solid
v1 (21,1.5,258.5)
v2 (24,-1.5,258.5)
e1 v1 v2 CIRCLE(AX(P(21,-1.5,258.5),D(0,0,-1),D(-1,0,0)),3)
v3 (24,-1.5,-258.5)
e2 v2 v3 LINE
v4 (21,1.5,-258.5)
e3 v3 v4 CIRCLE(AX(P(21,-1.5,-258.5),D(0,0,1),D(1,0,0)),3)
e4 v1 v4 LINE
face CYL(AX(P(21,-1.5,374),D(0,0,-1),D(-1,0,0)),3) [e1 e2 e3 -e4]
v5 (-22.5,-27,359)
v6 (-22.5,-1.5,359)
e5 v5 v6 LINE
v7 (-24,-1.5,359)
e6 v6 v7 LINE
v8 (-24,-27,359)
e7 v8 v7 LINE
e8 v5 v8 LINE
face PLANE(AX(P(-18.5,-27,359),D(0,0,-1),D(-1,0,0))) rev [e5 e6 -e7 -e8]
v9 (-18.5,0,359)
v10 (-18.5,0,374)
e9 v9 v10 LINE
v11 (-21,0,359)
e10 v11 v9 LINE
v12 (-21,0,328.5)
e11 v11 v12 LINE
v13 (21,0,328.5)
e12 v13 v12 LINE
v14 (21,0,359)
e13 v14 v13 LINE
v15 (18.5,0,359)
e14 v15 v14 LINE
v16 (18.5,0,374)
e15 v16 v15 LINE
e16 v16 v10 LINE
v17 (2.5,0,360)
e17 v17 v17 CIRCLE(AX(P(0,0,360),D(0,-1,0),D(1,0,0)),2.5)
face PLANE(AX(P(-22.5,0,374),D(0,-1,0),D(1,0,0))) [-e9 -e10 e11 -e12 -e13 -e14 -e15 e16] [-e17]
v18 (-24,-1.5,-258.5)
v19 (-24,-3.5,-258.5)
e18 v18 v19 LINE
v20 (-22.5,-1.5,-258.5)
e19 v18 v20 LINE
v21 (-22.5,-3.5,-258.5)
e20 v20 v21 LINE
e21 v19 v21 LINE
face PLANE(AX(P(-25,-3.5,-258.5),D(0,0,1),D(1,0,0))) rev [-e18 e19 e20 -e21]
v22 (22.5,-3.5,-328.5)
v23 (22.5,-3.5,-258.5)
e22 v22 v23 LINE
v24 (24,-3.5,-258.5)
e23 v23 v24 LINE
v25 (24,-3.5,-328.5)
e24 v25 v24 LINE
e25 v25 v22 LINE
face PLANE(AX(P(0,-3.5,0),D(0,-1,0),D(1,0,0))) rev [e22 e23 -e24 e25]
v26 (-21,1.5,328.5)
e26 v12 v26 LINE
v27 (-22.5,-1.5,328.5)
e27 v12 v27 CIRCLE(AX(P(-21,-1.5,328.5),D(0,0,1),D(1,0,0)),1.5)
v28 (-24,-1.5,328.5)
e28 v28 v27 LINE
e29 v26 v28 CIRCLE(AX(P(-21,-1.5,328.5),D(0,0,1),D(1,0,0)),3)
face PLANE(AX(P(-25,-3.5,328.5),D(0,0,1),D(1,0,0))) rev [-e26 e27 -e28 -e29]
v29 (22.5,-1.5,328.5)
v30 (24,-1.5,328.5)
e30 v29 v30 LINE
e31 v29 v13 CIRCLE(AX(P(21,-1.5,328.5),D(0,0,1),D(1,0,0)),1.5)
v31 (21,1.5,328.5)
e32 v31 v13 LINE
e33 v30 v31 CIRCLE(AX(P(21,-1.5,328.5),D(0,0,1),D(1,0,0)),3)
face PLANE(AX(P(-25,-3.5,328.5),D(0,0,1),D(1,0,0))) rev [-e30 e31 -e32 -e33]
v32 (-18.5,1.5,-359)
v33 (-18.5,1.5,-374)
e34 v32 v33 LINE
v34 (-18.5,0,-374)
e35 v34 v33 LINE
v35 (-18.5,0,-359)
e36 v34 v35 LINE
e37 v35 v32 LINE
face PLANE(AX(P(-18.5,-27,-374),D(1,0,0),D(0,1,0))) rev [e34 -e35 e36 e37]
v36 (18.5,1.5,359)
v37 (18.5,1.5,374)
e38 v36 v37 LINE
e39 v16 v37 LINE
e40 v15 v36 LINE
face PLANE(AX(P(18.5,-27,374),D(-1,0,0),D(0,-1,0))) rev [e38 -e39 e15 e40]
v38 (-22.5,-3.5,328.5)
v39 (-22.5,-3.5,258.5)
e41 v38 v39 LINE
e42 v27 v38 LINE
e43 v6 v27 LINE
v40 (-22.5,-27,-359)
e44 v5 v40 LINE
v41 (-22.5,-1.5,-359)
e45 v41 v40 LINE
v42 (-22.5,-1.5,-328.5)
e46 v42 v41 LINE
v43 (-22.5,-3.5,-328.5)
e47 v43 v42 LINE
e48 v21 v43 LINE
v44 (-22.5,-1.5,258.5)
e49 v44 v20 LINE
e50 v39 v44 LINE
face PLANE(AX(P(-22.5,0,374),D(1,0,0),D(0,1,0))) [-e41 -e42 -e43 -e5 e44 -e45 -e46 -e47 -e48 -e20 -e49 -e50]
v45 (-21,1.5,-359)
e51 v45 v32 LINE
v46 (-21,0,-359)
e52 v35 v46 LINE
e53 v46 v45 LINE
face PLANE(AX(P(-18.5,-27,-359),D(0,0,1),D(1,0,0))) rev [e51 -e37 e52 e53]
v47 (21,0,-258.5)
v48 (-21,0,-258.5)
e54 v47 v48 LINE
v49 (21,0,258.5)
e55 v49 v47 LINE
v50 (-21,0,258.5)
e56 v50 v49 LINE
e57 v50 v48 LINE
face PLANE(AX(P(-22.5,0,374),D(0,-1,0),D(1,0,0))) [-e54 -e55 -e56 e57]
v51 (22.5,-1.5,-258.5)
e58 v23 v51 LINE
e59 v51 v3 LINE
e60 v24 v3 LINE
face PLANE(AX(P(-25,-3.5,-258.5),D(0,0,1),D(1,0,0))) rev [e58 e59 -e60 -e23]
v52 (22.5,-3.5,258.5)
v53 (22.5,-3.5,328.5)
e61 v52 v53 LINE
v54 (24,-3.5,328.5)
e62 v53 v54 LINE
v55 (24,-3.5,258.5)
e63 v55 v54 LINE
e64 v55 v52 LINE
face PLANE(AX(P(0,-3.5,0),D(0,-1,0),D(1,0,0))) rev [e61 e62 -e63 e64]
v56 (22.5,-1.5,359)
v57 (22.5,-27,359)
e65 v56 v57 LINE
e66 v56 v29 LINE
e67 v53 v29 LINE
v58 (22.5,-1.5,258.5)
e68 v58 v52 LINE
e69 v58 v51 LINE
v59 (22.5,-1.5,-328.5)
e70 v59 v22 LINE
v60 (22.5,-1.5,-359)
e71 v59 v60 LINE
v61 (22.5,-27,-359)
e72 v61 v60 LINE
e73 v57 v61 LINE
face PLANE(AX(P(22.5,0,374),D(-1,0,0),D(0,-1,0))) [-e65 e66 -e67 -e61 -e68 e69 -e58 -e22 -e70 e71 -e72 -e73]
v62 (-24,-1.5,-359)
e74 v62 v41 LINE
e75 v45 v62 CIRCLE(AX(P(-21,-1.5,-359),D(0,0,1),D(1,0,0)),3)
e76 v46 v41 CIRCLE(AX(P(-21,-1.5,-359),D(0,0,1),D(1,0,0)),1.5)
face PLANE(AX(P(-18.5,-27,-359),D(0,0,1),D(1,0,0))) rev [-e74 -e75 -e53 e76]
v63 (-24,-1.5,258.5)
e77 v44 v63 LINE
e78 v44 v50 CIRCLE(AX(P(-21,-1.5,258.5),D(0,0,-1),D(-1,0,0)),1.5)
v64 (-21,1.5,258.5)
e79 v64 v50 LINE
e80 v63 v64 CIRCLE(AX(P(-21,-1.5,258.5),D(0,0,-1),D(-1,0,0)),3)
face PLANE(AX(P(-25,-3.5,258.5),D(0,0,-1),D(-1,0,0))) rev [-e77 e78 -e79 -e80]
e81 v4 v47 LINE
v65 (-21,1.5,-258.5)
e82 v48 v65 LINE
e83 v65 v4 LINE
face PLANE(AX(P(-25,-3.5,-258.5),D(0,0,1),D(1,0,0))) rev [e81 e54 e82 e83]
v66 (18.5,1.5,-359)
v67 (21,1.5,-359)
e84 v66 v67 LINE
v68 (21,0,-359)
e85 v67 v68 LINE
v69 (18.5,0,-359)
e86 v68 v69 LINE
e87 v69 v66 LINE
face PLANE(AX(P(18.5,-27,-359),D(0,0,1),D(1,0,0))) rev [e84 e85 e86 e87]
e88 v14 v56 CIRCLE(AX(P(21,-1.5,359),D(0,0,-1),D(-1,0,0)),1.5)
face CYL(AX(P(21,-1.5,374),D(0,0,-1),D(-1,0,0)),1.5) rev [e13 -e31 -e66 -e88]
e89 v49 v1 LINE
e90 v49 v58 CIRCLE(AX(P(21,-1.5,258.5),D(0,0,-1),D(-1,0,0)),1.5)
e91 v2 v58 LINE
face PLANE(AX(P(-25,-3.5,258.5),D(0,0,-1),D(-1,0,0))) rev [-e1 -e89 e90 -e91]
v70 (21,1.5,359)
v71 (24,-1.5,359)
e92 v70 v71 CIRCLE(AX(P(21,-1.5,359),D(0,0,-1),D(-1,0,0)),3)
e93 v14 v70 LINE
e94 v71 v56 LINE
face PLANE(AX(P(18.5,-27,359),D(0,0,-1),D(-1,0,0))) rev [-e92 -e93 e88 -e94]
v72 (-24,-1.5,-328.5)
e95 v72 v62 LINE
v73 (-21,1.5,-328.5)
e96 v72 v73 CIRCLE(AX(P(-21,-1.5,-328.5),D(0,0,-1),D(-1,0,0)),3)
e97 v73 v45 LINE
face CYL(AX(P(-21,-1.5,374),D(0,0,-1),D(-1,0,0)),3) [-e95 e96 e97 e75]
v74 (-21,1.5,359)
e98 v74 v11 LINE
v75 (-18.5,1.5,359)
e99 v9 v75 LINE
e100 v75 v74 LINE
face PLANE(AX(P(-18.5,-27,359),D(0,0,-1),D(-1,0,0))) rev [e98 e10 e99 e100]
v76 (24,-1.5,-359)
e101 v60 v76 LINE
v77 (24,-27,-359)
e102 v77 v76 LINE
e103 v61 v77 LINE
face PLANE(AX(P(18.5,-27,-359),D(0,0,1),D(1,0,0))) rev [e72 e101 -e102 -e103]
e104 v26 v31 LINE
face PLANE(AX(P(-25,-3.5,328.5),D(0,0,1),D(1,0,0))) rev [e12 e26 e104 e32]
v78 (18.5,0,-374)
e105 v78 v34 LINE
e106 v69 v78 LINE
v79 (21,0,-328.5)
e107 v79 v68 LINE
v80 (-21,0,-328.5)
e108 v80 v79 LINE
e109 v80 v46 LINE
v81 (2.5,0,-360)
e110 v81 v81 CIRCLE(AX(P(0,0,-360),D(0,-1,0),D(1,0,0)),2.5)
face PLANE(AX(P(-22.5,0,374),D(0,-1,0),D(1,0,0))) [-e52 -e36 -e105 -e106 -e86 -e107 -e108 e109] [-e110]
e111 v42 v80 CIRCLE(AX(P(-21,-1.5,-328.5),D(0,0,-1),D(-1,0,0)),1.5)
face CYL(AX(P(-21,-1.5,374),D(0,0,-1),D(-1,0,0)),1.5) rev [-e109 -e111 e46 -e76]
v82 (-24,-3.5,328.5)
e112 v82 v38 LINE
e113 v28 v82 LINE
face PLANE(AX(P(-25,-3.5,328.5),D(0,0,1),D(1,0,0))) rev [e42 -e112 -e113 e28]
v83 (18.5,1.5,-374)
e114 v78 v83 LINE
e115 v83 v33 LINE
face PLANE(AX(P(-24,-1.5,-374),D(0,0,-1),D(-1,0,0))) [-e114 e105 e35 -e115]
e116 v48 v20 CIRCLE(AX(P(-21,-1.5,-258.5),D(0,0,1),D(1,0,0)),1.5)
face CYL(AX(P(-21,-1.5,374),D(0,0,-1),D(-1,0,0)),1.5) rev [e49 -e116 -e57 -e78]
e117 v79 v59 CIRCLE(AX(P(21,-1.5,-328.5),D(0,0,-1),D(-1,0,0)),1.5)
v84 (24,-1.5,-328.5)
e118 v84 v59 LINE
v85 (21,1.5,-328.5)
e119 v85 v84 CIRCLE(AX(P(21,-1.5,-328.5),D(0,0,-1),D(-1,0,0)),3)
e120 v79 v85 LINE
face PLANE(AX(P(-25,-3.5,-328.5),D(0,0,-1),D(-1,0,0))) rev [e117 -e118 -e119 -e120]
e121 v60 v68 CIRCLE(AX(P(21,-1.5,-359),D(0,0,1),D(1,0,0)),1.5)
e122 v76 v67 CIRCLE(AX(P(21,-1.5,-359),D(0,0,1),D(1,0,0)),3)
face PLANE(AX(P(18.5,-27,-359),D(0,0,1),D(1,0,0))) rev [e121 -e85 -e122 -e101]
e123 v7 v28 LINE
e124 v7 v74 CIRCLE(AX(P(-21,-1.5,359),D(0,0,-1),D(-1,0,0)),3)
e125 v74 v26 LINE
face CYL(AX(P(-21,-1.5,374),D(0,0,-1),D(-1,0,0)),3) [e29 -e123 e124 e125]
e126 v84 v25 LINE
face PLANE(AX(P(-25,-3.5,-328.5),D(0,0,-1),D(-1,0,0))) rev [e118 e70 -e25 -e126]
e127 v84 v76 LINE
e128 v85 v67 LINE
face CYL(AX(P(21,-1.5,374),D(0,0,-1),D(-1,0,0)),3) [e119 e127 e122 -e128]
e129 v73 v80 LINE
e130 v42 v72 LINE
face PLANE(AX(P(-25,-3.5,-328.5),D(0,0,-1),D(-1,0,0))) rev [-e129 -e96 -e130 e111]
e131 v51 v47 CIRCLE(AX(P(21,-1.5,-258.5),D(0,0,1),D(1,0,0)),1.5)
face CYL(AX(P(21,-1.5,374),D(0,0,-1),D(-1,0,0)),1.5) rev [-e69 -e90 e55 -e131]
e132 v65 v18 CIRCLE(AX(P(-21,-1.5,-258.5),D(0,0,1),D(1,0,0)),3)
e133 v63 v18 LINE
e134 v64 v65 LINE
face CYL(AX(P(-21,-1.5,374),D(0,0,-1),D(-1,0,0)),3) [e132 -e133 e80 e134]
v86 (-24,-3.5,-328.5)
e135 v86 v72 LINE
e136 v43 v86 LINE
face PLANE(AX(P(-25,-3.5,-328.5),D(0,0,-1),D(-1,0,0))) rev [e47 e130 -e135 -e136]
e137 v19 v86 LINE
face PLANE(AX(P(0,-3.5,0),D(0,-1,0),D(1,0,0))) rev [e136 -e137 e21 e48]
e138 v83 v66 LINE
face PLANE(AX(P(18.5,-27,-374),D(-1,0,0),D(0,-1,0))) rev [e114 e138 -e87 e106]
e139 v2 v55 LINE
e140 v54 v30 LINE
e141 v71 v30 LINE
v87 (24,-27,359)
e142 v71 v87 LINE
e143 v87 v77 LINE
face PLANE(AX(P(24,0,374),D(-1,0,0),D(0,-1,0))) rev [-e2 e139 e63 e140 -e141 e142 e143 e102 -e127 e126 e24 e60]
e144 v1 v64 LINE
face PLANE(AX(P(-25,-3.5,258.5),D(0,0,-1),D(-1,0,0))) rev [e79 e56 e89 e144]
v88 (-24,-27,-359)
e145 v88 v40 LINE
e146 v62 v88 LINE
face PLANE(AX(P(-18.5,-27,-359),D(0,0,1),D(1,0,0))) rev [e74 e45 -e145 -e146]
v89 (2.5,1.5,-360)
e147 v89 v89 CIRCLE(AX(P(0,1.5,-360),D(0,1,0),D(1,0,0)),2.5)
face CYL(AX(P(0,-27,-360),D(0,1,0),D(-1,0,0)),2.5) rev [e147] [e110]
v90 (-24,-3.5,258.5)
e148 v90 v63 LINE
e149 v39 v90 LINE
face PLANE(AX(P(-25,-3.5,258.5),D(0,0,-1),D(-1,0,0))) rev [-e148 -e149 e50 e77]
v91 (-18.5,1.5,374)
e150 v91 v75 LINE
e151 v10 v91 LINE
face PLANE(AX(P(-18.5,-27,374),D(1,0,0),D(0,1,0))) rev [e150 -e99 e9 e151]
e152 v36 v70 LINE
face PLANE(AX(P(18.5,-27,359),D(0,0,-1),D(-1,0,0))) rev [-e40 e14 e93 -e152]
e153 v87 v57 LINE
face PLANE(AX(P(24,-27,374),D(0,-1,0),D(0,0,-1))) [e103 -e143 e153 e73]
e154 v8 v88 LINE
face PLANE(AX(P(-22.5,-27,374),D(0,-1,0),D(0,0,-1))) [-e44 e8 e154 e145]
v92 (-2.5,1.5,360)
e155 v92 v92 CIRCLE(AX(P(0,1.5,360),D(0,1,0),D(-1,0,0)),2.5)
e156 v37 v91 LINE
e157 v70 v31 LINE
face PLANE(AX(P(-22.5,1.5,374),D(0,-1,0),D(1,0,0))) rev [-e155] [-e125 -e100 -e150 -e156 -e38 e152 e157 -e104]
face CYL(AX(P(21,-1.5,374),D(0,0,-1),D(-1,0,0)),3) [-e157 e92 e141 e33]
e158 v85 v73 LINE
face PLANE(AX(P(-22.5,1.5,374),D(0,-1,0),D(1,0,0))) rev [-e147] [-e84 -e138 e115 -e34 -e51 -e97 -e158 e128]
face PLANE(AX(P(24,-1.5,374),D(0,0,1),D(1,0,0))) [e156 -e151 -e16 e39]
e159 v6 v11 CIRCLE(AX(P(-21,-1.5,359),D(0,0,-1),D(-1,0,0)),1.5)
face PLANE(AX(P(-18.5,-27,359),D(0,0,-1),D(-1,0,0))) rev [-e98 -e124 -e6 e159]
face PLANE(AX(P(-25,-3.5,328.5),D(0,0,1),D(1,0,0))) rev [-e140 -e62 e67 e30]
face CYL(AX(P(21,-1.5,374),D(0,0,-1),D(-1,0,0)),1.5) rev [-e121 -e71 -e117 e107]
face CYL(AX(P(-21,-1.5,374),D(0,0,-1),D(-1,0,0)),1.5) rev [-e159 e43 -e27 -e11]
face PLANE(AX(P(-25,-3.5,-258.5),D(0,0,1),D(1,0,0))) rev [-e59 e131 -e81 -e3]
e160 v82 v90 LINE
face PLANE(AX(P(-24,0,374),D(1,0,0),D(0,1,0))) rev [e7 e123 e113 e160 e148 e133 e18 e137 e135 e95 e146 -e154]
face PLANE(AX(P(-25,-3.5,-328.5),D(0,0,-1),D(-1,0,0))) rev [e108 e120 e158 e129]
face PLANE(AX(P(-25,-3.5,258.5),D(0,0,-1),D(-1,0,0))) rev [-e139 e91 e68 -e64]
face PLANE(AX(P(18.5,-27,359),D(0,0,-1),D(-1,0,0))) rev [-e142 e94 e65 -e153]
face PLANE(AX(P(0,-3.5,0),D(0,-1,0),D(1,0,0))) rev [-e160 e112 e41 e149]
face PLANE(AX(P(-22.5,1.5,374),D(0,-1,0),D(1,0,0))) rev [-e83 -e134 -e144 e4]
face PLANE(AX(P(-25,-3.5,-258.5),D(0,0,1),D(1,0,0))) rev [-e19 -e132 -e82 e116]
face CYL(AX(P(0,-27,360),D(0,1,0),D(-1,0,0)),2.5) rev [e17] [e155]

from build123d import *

# Parameters (mm, degrees)
SM_BASE_FLANGE_1_DEPTH = 374
SKETCH_6_R             = 2.5
SKETCH_6_W             = 6.5
SKETCH_6_H             = 15
CUT_EXTRUDE_1_DEPTH    = 376.851366899
SKETCH_7_W             = 50
SKETCH_7_H             = 70
CUT_EXTRUDE_2_DEPTH    = 5


# Sheet-metal steps are written as plain solids
with BuildPart() as part:
    # Sketch 1 → Базовая кромка1 (new, symmetric)
    with BuildSketch(Plane.XY):
        with BuildLine():
            Line((-22.5, -27), (-22.5, -1.5))
            ThreePointArc((-22.5, -1.5), (-22.060660172, -0.439339828), (-21, 0))
            Line((-21, 0), (21, 0))
            ThreePointArc((21, 0), (22.060660172, -0.439339828), (22.5, -1.5))
            Line((22.5, -1.5), (22.5, -27))
            Line((22.5, -27), (24, -27))
            Line((24, -27), (24, -1.5))
            ThreePointArc((24, -1.5), (23.121320344, 0.621320344), (21, 1.5))
            Line((21, 1.5), (-21, 1.5))
            ThreePointArc((-21, 1.5), (-23.121320344, 0.621320344), (-24, -1.5))
            Line((-24, -1.5), (-24, -27))
            Line((-24, -27), (-22.5, -27))
        make_face()
    extrude(amount=SM_BASE_FLANGE_1_DEPTH, both=True)

    # Эскиз6 → Вырез-Вытянуть1 (cut, through all)
    with BuildSketch(Plane(origin=(0, 1.5, 0), x_dir=(1, 0, 0), z_dir=(0, 1, 0))):
        with Locations(Location((0, -360, 0), (0, 0, 180))):
            Circle(SKETCH_6_R)
        with Locations((0, 360)):
            Circle(SKETCH_6_R)
        with Locations((-21.75, -366.5)):
            Rectangle(SKETCH_6_W, SKETCH_6_H)
        with Locations((21.75, -366.5)):
            Rectangle(SKETCH_6_W, SKETCH_6_H)
        with Locations((21.75, 366.5)):
            Rectangle(SKETCH_6_W, SKETCH_6_H)
        with Locations((-21.75, 366.5)):
            Rectangle(SKETCH_6_W, SKETCH_6_H)
    extrude(amount=-CUT_EXTRUDE_1_DEPTH, mode=Mode.SUBTRACT)

    # Эскиз7 → Вырез-Вытянуть2 (cut)
    with BuildSketch(Plane(origin=(0, 1.5, 0), x_dir=(1, 0, 0), z_dir=(0, 1, 0))):
        with Locations((0, -293.5)):
            Rectangle(SKETCH_7_W, SKETCH_7_H)
        with Locations((0, 293.5)):
            Rectangle(SKETCH_7_W, SKETCH_7_H)
    extrude(amount=-CUT_EXTRUDE_2_DEPTH, mode=Mode.SUBTRACT)


solid = part.part
